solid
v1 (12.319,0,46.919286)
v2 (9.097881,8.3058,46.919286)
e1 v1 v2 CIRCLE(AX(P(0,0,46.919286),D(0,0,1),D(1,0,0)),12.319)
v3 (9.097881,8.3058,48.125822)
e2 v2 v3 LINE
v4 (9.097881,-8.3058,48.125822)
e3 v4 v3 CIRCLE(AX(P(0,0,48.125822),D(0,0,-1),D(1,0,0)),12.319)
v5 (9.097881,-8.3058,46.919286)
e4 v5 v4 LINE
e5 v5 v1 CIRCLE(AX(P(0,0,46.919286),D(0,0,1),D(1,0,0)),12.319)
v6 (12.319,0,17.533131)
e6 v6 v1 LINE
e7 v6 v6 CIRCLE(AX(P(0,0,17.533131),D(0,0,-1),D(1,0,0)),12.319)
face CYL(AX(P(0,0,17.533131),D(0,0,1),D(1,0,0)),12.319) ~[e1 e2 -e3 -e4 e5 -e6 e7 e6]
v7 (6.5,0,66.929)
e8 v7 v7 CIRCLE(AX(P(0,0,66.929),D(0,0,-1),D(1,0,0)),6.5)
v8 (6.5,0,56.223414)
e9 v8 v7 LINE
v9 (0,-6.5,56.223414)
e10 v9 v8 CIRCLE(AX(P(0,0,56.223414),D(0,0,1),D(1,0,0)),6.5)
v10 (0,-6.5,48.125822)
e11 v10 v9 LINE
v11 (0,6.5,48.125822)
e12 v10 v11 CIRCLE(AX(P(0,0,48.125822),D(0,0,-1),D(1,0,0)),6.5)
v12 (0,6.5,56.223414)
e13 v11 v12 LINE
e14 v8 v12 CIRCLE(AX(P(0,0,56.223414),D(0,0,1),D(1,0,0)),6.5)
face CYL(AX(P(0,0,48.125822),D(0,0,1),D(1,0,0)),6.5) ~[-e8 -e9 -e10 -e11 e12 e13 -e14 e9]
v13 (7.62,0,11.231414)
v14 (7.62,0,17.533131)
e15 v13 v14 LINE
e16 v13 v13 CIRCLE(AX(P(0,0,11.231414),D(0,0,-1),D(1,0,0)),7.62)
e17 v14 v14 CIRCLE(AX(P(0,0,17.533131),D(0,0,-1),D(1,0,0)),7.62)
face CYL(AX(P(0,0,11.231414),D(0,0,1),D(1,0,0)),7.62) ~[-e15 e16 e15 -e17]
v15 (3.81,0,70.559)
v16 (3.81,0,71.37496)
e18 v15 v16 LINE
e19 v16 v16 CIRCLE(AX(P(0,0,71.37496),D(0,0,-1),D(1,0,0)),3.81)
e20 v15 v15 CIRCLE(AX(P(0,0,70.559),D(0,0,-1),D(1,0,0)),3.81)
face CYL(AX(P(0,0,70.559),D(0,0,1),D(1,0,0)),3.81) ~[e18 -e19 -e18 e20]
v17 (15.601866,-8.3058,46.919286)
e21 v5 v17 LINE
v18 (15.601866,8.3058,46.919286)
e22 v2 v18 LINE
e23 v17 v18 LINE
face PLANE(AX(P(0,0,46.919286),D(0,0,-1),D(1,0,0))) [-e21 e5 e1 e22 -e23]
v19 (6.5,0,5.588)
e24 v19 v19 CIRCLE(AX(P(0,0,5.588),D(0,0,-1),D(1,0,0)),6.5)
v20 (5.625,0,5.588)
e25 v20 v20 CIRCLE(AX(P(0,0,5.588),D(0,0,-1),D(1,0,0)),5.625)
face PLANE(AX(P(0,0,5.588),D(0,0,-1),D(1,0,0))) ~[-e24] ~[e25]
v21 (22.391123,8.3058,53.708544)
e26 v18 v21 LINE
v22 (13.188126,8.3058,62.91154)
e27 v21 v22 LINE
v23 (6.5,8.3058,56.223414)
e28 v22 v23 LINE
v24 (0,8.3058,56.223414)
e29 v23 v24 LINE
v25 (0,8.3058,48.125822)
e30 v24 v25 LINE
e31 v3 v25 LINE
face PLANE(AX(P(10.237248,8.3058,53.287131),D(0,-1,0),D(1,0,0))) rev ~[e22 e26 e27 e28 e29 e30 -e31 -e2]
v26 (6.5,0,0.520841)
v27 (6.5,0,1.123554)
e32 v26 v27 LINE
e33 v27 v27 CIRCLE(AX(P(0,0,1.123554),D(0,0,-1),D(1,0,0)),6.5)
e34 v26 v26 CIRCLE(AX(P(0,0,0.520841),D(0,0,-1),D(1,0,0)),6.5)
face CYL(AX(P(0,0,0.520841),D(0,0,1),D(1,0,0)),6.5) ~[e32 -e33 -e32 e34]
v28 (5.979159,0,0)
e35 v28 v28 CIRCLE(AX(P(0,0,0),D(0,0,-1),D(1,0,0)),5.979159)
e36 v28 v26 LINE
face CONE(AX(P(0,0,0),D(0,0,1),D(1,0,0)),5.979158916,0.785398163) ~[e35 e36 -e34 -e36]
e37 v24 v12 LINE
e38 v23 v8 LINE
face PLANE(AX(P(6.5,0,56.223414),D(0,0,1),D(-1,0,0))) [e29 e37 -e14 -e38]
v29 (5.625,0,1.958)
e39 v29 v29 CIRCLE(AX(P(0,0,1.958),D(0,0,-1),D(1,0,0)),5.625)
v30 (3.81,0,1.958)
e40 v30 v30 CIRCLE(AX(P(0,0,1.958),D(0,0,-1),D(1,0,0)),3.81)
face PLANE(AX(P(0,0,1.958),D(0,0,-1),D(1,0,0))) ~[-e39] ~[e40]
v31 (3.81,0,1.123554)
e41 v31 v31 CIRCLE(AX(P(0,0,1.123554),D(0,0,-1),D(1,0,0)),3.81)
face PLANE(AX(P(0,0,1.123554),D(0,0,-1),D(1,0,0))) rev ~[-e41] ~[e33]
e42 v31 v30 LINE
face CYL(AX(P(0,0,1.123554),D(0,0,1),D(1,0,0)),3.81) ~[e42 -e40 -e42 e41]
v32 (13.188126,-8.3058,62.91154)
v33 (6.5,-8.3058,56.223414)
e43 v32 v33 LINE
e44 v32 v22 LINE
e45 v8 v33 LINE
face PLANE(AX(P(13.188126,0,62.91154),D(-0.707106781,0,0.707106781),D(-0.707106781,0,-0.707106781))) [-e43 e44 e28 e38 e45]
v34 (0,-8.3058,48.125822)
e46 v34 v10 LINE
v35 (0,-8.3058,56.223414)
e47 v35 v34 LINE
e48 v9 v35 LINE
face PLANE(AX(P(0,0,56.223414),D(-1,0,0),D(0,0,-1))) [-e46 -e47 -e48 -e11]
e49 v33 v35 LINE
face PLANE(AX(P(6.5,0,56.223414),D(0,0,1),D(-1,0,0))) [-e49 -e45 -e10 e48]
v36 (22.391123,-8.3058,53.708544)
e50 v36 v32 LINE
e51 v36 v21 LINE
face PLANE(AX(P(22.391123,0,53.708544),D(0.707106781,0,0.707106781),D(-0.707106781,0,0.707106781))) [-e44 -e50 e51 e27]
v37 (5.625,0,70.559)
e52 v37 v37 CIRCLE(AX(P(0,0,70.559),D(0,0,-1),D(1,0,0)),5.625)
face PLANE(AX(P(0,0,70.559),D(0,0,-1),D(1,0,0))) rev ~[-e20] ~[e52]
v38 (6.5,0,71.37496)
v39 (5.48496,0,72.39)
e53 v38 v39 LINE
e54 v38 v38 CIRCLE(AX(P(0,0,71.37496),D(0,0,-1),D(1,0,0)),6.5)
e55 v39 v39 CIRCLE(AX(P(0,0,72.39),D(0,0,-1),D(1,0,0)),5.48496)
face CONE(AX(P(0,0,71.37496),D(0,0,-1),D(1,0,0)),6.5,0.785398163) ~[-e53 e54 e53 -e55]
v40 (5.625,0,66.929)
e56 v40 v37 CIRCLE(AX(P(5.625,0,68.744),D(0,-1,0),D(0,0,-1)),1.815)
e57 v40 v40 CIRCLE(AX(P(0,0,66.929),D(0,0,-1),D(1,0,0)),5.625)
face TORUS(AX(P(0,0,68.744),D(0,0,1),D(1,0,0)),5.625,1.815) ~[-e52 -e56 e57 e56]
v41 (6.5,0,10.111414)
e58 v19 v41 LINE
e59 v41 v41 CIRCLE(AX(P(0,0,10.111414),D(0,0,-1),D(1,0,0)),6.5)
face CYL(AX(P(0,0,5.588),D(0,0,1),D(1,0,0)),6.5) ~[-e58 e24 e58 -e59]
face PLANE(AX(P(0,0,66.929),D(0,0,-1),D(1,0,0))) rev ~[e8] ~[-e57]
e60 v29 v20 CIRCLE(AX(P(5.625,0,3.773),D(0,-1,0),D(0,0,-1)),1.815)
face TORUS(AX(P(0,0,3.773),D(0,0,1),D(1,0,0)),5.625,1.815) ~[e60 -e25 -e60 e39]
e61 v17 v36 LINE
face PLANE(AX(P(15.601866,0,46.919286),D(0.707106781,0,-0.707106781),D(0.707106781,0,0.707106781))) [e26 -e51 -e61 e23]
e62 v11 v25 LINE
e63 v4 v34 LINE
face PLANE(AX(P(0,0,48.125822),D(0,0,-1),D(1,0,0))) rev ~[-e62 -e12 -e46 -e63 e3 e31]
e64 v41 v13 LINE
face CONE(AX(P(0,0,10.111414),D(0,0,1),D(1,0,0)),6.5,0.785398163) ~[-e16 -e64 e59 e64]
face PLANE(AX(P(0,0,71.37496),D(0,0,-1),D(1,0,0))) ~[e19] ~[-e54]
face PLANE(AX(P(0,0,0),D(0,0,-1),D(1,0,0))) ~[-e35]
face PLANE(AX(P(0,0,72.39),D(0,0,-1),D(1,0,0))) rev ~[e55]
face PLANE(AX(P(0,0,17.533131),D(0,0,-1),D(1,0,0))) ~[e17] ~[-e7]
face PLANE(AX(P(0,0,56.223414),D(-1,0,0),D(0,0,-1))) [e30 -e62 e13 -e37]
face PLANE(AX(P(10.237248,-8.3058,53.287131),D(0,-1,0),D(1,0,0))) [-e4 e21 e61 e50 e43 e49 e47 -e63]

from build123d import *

# Parameters (mm, degrees)
F3_DEPTH = 8.3058


with BuildPart() as f1:
    # F0 (on Front) → F1 (revolve)
    with BuildSketch(Plane.XZ):
        with BuildLine():
            Line((5.4849602437, 72.39), (0, 72.39))
            Line((0, 72.39), (0, 0))
            Line((0, 0), (5.9791589156, 0))
            Line((5.9791589156, 0), (6.5, 0.5208410844))
            Line((6.5, 0.5208410844), (6.5, 1.1235540733))
            Line((6.5, 1.1235540733), (3.81, 1.1235540733))
            Line((3.81, 1.1235540733), (3.81, 1.958))
            Line((3.81, 1.958), (5.625, 1.958))
            ThreePointArc((5.625, 1.958), (7.44, 3.773), (5.625, 5.588))
            Line((5.625, 5.588), (6.5, 5.588))
            Line((6.5, 5.588), (6.5, 10.1114138961))
            Line((6.5, 10.1114138961), (7.62, 11.2314138961))
            Line((7.62, 11.2314138961), (7.62, 17.5331309438))
            Line((7.62, 17.5331309438), (12.319, 17.5331309438))
            Line((12.319, 17.5331309438), (12.319, 48.1258220971))
            Line((12.319, 48.1258220971), (6.5, 48.1258220971))
            Line((6.5, 48.1258220971), (6.5, 66.929))
            Line((6.5, 66.929), (5.625, 66.929))
            ThreePointArc((5.625, 66.929), (7.44, 68.744), (5.625, 70.559))
            Line((5.625, 70.559), (3.81, 70.559))
            Line((3.81, 70.559), (3.81, 71.3749602437))
            Line((3.81, 71.3749602437), (6.5, 71.3749602437))
            Line((6.5, 71.3749602437), (5.4849602437, 72.39))
        make_face()
    revolve(axis=Axis((0, 0, 36.195), (0, 0, -1)))

    # F2 (on Front) → F3 (join, symmetric)
    with BuildSketch(Plane.XZ):
        Polygon((13.188126497, 62.9115402699), (6.5, 56.2234137729), (0, 56.2234137729), (0, 46.9192864976), (12.319, 46.9192864976), (15.6018657007, 46.9192864976), (22.391122985, 53.7085437818), align=None)
    extrude(amount=F3_DEPTH, both=True)


solid = f1.part
